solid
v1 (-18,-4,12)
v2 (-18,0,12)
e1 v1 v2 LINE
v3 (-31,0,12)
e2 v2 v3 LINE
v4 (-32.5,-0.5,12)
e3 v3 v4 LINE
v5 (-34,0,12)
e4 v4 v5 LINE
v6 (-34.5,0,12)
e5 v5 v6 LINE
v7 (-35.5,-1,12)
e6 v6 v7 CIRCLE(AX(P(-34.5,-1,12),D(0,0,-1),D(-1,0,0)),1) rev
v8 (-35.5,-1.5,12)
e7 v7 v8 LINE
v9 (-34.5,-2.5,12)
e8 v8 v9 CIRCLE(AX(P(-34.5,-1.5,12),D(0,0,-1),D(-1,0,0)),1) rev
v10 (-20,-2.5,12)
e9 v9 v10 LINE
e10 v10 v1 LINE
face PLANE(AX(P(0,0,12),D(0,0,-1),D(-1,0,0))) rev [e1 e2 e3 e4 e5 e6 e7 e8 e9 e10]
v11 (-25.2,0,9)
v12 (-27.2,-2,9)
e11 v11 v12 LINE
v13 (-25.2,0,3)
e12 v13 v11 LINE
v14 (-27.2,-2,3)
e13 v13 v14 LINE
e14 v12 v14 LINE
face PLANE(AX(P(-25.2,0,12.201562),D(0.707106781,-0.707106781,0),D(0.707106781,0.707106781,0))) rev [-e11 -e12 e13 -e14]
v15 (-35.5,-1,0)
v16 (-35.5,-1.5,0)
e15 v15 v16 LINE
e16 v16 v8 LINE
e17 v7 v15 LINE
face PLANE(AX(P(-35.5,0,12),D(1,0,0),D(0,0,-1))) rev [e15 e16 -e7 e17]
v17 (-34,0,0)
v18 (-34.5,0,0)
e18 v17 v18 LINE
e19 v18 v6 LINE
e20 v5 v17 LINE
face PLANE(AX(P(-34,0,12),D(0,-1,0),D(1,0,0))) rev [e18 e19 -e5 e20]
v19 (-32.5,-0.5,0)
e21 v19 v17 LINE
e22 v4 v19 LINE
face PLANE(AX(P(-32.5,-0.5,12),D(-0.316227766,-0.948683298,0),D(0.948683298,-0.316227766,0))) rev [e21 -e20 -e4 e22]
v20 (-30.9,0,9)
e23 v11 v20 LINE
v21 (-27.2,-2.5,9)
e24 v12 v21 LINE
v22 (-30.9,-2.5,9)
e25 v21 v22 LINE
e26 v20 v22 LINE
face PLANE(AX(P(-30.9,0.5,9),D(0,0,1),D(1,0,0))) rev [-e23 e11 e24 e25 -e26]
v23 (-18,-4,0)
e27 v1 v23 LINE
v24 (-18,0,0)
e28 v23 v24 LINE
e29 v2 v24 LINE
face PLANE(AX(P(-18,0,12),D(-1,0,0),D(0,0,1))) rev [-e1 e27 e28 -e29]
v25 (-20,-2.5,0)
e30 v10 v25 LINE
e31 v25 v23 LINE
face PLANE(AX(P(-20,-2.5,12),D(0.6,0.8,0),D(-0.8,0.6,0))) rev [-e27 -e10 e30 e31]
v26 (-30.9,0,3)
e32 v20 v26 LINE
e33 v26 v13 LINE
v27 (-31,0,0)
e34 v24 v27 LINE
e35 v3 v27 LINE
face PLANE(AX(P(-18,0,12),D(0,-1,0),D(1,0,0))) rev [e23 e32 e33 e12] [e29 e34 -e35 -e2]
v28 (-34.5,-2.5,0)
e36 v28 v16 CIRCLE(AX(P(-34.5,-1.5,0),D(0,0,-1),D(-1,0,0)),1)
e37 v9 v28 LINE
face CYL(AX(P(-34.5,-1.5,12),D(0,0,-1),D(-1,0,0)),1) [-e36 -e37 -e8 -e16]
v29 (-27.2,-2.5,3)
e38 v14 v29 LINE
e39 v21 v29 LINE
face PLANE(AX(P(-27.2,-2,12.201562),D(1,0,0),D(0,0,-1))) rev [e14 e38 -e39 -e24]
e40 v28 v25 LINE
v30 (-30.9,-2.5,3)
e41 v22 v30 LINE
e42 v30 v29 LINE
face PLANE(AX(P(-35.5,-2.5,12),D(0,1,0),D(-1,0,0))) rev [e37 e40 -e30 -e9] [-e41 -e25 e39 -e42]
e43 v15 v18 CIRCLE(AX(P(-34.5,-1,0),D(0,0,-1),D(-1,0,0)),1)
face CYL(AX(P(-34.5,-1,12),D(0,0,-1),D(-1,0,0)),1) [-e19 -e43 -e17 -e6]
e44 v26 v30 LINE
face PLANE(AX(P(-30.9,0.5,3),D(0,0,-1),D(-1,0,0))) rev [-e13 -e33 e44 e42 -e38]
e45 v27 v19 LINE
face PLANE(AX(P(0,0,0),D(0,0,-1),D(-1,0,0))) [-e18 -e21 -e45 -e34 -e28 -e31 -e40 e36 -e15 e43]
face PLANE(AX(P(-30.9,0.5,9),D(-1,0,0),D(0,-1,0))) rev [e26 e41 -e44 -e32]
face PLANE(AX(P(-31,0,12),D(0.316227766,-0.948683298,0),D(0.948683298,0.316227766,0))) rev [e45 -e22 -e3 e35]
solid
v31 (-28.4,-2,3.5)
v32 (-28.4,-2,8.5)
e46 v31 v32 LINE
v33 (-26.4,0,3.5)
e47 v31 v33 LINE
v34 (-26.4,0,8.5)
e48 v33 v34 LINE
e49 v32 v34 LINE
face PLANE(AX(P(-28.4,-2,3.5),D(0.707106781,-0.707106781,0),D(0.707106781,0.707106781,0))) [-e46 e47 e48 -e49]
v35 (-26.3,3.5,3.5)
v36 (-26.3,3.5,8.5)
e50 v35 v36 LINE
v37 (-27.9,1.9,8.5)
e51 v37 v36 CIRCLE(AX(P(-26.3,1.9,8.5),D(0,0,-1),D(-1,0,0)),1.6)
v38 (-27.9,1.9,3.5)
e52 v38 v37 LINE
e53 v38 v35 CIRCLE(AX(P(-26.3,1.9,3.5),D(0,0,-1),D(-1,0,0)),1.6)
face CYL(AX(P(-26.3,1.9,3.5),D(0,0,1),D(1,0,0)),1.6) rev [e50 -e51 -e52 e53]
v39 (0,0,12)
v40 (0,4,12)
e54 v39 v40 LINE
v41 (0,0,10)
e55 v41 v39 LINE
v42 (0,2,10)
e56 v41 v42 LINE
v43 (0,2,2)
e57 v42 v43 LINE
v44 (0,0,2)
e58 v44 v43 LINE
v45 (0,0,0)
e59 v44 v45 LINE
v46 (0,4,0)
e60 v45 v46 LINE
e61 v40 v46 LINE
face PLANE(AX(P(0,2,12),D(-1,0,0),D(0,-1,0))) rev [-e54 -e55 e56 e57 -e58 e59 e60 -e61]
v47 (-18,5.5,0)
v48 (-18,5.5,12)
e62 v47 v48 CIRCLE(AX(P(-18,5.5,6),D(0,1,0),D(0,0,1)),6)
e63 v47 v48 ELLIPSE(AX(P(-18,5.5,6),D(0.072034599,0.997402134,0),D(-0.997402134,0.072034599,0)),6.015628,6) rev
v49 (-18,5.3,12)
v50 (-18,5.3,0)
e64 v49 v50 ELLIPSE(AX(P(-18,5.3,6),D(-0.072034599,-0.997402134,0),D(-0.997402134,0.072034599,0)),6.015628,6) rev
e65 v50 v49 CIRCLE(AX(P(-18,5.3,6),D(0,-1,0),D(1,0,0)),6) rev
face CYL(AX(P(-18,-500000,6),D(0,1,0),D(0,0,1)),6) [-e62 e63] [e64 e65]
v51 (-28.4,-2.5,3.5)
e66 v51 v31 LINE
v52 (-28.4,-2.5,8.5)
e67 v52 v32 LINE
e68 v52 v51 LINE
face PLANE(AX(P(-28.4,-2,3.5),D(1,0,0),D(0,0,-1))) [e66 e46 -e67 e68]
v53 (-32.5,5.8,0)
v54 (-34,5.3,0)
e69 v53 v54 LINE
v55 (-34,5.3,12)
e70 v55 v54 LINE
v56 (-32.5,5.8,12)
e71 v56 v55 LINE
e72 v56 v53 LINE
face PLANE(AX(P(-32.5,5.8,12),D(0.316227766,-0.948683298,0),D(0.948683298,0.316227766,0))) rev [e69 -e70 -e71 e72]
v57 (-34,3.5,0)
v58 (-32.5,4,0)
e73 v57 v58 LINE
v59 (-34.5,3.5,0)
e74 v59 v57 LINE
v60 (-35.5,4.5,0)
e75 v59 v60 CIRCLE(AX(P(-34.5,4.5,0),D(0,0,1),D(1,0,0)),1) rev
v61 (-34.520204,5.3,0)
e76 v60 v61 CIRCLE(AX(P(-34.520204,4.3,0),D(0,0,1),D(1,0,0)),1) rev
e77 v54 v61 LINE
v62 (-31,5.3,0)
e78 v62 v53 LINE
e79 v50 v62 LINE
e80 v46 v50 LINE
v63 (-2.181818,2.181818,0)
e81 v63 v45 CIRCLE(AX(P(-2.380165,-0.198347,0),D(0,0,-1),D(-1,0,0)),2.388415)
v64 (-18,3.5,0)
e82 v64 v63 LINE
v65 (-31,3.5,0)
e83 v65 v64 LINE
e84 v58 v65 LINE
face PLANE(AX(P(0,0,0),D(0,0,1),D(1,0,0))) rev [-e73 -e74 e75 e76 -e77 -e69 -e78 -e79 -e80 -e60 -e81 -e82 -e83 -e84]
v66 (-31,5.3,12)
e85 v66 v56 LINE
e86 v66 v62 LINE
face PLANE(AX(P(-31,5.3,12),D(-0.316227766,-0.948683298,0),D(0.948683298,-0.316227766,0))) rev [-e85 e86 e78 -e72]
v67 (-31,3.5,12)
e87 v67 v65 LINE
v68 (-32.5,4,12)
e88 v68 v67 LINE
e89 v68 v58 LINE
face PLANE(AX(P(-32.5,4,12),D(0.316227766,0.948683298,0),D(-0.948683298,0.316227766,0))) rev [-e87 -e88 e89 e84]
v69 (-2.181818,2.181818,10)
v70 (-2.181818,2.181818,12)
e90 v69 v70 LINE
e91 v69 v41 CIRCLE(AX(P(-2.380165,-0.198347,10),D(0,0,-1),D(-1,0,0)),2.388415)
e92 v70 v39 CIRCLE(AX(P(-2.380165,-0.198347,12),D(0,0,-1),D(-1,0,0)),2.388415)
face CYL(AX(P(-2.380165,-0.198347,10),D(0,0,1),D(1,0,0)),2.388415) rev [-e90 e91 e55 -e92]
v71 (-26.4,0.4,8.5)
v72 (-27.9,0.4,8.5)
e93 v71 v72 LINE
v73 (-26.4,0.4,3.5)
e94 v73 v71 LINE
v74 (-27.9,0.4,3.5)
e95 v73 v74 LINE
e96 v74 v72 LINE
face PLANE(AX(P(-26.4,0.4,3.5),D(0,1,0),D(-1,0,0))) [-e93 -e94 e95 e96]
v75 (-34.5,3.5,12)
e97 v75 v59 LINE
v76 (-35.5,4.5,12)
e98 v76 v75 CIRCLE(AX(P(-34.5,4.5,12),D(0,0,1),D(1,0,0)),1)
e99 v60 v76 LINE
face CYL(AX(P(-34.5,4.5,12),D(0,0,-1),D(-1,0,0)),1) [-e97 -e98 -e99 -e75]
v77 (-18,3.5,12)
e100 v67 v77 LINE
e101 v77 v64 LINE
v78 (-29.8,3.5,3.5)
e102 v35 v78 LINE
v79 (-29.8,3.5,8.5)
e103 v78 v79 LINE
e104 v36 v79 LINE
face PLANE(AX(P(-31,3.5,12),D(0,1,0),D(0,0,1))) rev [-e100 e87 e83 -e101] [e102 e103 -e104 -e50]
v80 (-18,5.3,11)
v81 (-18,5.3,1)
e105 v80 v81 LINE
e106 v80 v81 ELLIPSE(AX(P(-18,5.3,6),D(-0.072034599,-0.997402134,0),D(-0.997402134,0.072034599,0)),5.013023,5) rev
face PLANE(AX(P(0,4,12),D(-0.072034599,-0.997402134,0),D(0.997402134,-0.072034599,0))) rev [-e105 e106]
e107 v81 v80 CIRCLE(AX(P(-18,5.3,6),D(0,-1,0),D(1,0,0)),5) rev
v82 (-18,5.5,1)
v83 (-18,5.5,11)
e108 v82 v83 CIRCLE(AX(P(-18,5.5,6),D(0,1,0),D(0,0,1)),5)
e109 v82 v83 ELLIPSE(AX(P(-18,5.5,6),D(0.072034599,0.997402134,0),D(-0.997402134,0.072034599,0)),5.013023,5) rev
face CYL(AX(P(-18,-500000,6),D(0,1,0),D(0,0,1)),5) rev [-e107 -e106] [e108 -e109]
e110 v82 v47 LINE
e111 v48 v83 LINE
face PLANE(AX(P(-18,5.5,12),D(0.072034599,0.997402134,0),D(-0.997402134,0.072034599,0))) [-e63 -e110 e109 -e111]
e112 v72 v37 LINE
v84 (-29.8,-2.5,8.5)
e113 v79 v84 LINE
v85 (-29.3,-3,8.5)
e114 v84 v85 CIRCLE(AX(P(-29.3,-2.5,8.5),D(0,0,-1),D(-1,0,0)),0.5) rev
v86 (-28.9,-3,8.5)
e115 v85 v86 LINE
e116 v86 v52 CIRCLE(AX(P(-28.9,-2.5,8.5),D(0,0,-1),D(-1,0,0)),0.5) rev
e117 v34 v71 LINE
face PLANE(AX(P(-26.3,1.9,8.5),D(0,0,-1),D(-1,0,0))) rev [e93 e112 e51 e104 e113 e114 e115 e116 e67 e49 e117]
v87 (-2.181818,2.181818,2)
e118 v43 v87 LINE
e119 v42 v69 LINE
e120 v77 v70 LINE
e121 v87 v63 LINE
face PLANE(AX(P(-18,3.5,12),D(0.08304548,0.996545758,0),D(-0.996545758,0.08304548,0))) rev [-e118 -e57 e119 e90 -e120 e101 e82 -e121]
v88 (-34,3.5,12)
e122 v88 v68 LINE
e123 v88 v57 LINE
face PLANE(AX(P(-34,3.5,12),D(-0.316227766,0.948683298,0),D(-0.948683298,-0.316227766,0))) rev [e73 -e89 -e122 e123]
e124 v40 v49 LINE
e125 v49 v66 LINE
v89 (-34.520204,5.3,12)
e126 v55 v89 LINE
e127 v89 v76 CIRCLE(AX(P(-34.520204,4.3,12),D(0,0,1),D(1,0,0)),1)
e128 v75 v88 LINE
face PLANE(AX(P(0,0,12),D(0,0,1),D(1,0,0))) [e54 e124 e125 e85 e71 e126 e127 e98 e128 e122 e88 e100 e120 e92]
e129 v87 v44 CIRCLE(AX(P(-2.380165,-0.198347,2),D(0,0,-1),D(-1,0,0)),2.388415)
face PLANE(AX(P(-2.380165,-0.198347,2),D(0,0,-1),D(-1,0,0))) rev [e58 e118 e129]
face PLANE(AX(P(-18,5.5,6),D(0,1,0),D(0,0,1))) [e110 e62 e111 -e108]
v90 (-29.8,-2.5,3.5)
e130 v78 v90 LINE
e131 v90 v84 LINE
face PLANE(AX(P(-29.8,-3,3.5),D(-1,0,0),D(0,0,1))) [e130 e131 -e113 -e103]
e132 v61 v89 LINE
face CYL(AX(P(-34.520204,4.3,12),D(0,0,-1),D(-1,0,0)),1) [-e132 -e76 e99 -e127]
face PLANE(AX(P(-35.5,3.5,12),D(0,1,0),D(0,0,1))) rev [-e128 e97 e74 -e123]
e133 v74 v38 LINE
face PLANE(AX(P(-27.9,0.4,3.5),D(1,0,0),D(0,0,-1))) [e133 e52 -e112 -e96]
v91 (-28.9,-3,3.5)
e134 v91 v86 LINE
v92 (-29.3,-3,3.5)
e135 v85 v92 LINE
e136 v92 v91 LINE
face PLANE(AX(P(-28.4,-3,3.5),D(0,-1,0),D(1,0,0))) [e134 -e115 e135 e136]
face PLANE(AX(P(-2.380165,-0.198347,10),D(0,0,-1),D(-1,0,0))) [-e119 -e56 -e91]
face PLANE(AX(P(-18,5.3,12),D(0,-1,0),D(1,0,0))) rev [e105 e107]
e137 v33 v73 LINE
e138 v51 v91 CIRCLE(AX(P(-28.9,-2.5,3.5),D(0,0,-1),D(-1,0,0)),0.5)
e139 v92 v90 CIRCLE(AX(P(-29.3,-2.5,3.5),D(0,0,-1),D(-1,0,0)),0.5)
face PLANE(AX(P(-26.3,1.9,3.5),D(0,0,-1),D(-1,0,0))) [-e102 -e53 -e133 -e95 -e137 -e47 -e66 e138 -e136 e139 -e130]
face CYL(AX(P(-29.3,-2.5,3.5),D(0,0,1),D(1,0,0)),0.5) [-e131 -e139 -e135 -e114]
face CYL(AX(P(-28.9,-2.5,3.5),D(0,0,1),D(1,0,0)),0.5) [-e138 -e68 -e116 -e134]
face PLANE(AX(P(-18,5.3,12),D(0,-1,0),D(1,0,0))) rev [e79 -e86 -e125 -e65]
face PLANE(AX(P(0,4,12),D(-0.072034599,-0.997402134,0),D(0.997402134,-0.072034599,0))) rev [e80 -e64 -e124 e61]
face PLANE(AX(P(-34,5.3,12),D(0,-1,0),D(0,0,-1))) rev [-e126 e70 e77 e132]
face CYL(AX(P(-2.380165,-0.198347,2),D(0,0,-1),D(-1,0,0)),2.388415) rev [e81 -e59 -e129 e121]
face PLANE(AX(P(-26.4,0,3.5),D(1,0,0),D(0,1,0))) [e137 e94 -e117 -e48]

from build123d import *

# Parameters (mm, degrees)
BOSS_EXTRUDE1_DEPTH   = 12
BOSS_EXTRUDE1_2_DEPTH = 12
SKETCH2_W             = 5.7
SKETCH2_H             = 6
CUT_EXTRUDE1_DEPTH    = 3
BOSS_EXTRUDE2_DEPTH   = 6
BOSS_EXTRUDE3_START   = -6
BOSS_EXTRUDE3_DEPTH   = 2.5
FILLET7_R             = 1
FILLET8_R             = 1
FILLET10_R            = 1
FILLET11_R            = 1
BOSS_EXTRUDE4_DEPTH   = 2
BOSS_EXTRUDE5_START   = -10
BOSS_EXTRUDE5_DEPTH   = 2
FILLET12_R            = 0.5
BOSS_EXTRUDE7_REACH   = 45.42
BOSS_EXTRUDE7_START   = 5.5
SKETCH6_R             = 6
SKETCH6_R_2           = 5
CUT_EXTRUDE3_DEPTH    = 38.919520039


with BuildPart() as part:
    # Sketch1 → Boss-Extrude1 (new body)
    with BuildSketch(Plane.XY):
        Polygon((0, 4), (-18, 5.3), (-31, 5.3), (-32.5, 5.8), (-34, 5.3), (-35.5, 5.3), (-35.5, 3.5), (-34, 3.5), (-32.5, 4), (-31, 3.5), (-18, 3.5), (0, 2), align=None)
    extrude(amount=BOSS_EXTRUDE1_DEPTH)

    # Sketch4 → Boss-Extrude3 (add, symmetric)
    with BuildSketch(Plane.XY.offset(12).offset(BOSS_EXTRUDE3_START)):
        with BuildLine():
            Line((-28.4, -2), (-26.4, 0))
            Line((-26.4, 0), (-26.4, 0.4))
            Line((-26.4, 0.4), (-27.9, 0.4))
            Line((-27.9, 0.4), (-27.9, 1.9))
            ThreePointArc((-27.9, 1.9), (-27.43137085, 3.03137085), (-26.3, 3.5))
            Line((-26.3, 3.5), (-29.8, 3.5))
            Line((-29.8, 3.5), (-29.8, -3))
            Line((-29.8, -3), (-28.4, -3))
            Line((-28.4, -3), (-28.4, -2))
        make_face()
    extrude(amount=BOSS_EXTRUDE3_DEPTH, both=True)

    # Fillet8
    fillet8_edges = [part.edges().sort_by_distance(p)[0] for p in [
        (-35.5, 3.5, 6),
    ]]
    fillet(fillet8_edges, radius=FILLET8_R)

    # Fillet10
    # the kernel refuses this fillet: 1 mm, written as the material it takes off along each edge
    with BuildSketch(Plane(origin=(-35.5, 5.3, -2.449489743), x_dir=(1.545430450277731e-12, -1.0, 0), z_dir=(0, 0, 1))) as fillet10_piece_1:
        with BuildLine():
            CenterArc((1, 0.979795897), FILLET10_R, 180, 78.463040967)
            Line((0, 0.979795897), (-0.02, 0.979795897))
            Line((-0.02, 0.979795897), (-0.02, 0))
            Line((-0.02, 0), (0, -0.02))
            ThreePointArc((0, -0.02), (0.4, -0.02), (0.796, -0.019595918))
            Line((0.796, -0.019595918), (0.8, 0))
        make_face()
    extrude(amount=16.898979486, mode=Mode.SUBTRACT)

    # Sketch5 → Boss-Extrude4 (add)
    with BuildSketch(Plane.XY.offset(12)):
        with BuildLine():
            Line((0, 2), (0, 0))
            ThreePointArc((0, 0), (-0.691300526, 1.490517656), (-2.181818182, 2.181818182))
            Line((-2.181818182, 2.181818182), (0, 2))
        make_face()
    extrude(amount=-BOSS_EXTRUDE4_DEPTH)

    # Sketch5<2> → Boss-Extrude5 (add)
    with BuildSketch(Plane.XY.offset(12).offset(BOSS_EXTRUDE5_START)):
        with BuildLine():
            Line((0, 2), (0, 0))
            ThreePointArc((0, 0), (-0.691300526, 1.490517656), (-2.181818182, 2.181818182))
            Line((-2.181818182, 2.181818182), (0, 2))
        make_face()
    extrude(amount=-BOSS_EXTRUDE5_DEPTH)

    # Fillet12
    fillet12_edges = [part.edges().sort_by_distance(p)[0] for p in [
        (-28.4, -3, 6),
        (-29.8, -3, 6),
    ]]
    fillet(fillet12_edges, radius=FILLET12_R)

    # Sketch6 → Boss-Extrude7 (add, up to next)
    with BuildSketch(Plane(origin=(0, 0, 0), x_dir=(1, 0, 0), z_dir=(0, 1, 0)).offset(BOSS_EXTRUDE7_START), mode=Mode.PRIVATE) as boss_extrude7_sk1:
        with Locations(Location((-18, -6, 0), (0, 0, 270))):
            Circle(SKETCH6_R)
        with Locations(Location((-18, -6, 0), (0, 0, 270))):
            Circle(SKETCH6_R_2, mode=Mode.SUBTRACT)
    boss_extrude7_tool1 = extrude(boss_extrude7_sk1.sketch, amount=-BOSS_EXTRUDE7_REACH, mode=Mode.PRIVATE) - part.part
    add(boss_extrude7_tool1.solids().sort_by_distance((-18, 5.5, 0.169706))[0])

    # Sketch7 → Cut-Extrude3 (cut, through all)
    with BuildSketch(Plane.XY):
        Polygon((-18, 5.5), (-12, 5.066666667), (-12, 5.5), align=None)
    extrude(amount=CUT_EXTRUDE3_DEPTH, mode=Mode.SUBTRACT)


with BuildPart() as body_2:
    # Sketch1 → Boss-Extrude1 2 (new body)
    with BuildSketch(Plane.XY):
        Polygon((-35.5, -2.5), (-20, -2.5), (-18, -4), (-18, 0), (-31, 0), (-32.5, -0.5), (-34, 0), (-35.5, 0), align=None)
    extrude(amount=BOSS_EXTRUDE1_2_DEPTH)

    # Sketch2 → Cut-Extrude1 (cut)
    with BuildSketch(Plane.XZ.offset(2.5)):
        with Locations((-28.05, 6)):
            Rectangle(SKETCH2_W, SKETCH2_H)
    extrude(amount=-CUT_EXTRUDE1_DEPTH, mode=Mode.SUBTRACT)

    # Sketch3 → Boss-Extrude2 (add)
    with BuildSketch(Plane.XY.offset(3)):
        Polygon((-25.2, 0), (-27.2, -2), (-27.2, -2.5), (-25.2, -2.5), align=None)
    extrude(amount=BOSS_EXTRUDE2_DEPTH)

    # Fillet7
    fillet7_edges = [body_2.edges().sort_by_distance(p)[0] for p in [
        (-35.5, 0, 6),
    ]]
    fillet(fillet7_edges, radius=FILLET7_R)

    # Fillet11
    fillet11_edges = [body_2.edges().sort_by_distance(p)[0] for p in [
        (-35.5, -2.5, 6),
    ]]
    fillet(fillet11_edges, radius=FILLET11_R)


solid = Compound([part.part, body_2.part])
